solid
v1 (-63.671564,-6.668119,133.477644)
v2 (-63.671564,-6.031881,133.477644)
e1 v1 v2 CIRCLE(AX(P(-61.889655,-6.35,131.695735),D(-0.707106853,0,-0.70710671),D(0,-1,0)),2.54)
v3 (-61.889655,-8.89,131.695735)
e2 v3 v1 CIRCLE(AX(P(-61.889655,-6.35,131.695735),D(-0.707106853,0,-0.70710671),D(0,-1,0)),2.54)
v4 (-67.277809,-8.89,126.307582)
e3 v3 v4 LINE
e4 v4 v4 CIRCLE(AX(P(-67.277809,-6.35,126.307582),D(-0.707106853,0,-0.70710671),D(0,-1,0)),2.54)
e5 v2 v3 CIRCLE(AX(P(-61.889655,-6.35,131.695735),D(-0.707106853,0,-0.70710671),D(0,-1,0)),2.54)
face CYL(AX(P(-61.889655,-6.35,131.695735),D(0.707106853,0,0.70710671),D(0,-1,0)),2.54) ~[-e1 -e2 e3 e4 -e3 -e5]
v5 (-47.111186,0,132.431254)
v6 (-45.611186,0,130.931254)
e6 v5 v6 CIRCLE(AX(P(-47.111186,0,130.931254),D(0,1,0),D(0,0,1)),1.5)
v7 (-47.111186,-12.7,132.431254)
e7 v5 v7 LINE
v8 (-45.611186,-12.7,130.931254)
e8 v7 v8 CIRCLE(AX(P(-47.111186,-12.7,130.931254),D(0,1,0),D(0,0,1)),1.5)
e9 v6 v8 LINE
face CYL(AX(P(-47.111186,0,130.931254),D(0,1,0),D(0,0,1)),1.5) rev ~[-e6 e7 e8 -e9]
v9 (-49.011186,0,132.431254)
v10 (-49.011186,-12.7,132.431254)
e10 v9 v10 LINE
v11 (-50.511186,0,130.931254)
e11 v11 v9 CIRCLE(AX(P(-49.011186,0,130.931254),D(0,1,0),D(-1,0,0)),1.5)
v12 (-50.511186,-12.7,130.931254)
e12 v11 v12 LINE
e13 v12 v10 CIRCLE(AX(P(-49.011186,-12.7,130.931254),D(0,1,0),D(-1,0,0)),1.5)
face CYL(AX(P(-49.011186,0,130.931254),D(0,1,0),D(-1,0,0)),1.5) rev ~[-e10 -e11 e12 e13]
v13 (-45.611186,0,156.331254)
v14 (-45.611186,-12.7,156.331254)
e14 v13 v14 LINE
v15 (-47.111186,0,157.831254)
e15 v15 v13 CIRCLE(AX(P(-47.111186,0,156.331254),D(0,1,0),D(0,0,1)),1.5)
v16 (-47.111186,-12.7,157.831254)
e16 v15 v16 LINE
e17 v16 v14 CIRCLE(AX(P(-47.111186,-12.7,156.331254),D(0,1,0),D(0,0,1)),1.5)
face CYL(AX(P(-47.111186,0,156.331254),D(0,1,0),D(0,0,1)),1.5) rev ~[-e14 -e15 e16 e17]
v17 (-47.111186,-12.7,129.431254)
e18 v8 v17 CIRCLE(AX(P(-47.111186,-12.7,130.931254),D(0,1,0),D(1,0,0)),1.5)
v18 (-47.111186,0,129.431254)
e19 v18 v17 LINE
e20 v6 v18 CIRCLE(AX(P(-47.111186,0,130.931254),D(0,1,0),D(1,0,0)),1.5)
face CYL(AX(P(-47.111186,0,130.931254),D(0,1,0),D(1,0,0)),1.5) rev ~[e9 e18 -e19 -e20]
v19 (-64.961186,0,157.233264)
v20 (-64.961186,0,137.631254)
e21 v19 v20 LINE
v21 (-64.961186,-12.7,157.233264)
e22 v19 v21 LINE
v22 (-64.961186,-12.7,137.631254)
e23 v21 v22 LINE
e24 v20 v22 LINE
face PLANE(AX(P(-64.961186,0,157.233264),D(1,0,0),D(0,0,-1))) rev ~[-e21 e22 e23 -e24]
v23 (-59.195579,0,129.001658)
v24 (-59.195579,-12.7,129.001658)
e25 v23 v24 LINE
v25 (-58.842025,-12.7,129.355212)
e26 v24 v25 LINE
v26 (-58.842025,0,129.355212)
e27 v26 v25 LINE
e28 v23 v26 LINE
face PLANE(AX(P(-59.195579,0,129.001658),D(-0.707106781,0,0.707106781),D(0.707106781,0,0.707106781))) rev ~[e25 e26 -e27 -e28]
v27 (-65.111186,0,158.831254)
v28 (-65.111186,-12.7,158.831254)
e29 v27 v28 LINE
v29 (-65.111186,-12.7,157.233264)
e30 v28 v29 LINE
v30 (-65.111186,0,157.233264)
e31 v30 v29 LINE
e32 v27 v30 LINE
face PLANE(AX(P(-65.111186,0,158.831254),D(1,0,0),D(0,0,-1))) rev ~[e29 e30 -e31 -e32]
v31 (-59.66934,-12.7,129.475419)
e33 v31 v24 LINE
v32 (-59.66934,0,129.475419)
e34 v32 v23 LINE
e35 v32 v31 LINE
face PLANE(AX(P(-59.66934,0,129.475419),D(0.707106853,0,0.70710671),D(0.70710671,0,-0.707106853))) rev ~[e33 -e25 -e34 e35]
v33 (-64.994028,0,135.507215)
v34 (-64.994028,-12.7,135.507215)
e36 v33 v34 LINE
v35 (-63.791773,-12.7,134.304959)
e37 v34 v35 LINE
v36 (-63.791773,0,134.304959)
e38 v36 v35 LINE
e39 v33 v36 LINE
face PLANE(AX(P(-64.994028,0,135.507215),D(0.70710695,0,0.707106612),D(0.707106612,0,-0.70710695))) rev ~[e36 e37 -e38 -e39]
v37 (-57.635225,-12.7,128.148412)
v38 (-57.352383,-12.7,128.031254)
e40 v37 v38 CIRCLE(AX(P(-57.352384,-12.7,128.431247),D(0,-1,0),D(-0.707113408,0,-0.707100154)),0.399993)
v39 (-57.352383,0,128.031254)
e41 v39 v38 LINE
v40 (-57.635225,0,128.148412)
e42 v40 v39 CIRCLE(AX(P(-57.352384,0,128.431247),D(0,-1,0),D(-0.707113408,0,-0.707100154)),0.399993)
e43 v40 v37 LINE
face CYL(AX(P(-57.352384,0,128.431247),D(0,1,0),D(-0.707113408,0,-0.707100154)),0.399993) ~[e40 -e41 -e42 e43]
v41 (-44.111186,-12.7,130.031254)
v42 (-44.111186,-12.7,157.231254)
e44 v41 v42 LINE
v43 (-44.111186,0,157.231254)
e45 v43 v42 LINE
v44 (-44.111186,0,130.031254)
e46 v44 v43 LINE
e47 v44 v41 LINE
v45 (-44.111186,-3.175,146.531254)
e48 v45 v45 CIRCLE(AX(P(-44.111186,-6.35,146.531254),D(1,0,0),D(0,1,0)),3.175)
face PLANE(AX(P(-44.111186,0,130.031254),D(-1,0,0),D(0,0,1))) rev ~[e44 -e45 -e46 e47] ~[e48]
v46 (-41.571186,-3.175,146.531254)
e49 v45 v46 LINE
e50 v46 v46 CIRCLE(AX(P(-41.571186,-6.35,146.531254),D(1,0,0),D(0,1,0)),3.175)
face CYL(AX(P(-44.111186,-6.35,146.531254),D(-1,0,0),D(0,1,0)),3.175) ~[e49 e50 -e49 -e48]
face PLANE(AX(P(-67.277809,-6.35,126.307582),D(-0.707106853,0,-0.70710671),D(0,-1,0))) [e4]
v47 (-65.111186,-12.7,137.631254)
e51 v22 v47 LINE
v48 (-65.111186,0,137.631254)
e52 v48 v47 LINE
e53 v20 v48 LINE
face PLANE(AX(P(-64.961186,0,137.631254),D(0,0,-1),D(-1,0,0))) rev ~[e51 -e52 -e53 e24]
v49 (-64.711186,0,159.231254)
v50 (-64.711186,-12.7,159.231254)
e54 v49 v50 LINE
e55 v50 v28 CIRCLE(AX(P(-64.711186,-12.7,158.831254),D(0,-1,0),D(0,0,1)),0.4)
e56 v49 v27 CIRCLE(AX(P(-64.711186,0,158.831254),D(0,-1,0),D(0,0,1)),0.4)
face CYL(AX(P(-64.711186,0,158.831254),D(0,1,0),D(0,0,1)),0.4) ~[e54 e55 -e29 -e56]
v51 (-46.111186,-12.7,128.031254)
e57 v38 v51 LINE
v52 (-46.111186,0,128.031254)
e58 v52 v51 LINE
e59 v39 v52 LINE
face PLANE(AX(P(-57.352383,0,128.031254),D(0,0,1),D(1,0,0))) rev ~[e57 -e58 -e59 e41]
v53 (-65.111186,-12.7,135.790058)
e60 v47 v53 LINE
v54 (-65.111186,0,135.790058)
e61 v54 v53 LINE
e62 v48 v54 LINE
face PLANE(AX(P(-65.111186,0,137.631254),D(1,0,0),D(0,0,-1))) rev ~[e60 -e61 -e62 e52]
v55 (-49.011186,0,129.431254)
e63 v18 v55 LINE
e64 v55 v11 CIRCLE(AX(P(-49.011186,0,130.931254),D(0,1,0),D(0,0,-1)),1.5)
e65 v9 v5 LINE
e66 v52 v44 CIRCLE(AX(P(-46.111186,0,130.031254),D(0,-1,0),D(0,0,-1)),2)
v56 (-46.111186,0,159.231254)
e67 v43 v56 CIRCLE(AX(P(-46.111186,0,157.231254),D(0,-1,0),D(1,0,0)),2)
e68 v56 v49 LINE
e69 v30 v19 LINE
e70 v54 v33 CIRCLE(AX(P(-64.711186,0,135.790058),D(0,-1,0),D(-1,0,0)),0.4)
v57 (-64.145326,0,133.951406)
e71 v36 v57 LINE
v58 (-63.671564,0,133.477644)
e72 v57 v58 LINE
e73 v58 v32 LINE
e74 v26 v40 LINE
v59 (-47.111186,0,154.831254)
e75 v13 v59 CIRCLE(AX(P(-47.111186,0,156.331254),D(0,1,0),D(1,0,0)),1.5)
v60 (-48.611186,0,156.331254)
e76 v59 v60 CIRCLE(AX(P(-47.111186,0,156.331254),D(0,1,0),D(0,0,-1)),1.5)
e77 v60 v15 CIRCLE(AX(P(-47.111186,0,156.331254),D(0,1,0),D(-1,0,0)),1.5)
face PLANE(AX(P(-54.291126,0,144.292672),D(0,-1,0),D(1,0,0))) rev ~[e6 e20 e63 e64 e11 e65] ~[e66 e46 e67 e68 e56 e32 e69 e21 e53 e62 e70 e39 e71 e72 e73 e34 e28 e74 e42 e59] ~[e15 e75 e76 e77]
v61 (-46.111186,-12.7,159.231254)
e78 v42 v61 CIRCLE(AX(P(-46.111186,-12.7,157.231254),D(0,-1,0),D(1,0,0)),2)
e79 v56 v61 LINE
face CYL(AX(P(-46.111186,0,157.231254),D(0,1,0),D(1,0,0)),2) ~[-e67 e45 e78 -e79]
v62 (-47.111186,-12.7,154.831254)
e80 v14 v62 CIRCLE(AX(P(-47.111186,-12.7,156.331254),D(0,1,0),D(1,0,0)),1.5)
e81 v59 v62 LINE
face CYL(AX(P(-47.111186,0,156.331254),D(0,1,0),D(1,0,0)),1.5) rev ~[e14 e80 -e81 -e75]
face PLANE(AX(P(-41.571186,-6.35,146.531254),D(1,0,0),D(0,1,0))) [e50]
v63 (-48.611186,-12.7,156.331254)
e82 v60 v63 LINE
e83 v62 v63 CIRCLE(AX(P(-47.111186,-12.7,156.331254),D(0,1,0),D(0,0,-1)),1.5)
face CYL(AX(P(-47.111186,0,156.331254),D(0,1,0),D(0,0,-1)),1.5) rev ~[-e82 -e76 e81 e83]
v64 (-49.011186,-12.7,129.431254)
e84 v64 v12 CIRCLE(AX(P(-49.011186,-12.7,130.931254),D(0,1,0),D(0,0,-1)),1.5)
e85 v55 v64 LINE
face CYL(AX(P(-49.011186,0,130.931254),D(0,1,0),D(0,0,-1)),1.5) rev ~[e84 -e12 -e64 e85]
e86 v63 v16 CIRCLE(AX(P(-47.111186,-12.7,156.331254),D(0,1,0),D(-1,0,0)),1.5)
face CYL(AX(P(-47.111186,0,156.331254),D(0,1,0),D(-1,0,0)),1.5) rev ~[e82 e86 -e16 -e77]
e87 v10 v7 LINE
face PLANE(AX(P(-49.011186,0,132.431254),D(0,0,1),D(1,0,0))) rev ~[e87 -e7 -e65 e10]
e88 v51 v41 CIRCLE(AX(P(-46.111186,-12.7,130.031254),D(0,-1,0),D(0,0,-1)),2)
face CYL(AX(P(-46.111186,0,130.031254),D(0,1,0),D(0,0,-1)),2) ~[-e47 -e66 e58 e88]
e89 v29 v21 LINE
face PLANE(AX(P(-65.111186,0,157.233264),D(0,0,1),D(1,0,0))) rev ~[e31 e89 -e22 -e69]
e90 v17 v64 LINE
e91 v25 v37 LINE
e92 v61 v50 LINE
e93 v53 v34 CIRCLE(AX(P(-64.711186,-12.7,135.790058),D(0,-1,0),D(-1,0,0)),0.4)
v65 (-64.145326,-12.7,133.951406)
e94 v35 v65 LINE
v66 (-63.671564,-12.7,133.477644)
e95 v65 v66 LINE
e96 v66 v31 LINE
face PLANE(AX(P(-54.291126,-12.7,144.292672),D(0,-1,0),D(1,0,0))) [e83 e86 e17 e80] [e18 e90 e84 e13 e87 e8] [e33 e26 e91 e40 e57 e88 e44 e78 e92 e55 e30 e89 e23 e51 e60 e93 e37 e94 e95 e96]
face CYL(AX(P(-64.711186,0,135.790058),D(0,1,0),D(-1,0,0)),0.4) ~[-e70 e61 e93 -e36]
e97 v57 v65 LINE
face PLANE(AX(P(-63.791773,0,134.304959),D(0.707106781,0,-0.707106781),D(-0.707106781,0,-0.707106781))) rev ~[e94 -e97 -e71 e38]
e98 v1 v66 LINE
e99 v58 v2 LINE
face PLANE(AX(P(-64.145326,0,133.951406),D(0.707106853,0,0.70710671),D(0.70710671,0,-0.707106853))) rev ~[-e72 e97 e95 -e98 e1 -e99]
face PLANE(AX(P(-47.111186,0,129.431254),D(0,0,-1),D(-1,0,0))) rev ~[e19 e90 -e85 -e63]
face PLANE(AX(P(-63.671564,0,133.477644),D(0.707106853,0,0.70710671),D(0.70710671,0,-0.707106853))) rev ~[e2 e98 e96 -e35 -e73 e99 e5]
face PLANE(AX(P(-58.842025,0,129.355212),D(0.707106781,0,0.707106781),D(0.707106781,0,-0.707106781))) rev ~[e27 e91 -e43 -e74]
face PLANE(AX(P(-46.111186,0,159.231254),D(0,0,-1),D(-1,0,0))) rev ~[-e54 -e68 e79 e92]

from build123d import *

# Parameters (mm, degrees)
F1_DEPTH = 12.7
F2_R     = 2.54
F3_DEPTH = 7.62
F4_R     = 3.175
F5_DEPTH = 2.54


# Not quite as in the source:
# - ends of sketch curves that miss each other by under 0.0002 mm in the source are joined


with BuildPart() as f1:
    # F0 (on Front) → F1 (new body)
    with BuildSketch(Plane.XZ):
        with BuildLine():
            Line((-46.1111856, 159.2312536), (-64.7111856, 159.2312536))
            ThreePointArc((-64.7111856, 159.2312536), (-64.9940283125, 159.1140963125), (-65.1111856, 158.8312536))
            Line((-65.1111856, 158.8312536), (-65.1111856, 157.2332636))
            Line((-65.1111856, 157.2332636), (-64.9611856, 157.2332636))
            Line((-64.9611856, 157.2332636), (-64.9611856, 137.6312536))
            Line((-64.9611856, 137.6312536), (-65.1111856, 137.6312536))
            Line((-65.1111856, 137.6312536), (-65.1111856, 135.7900576))
            ThreePointArc((-65.1111856, 135.7900576), (-65.080737413, 135.6369842271), (-64.9940283125, 135.5072148875))
            Line((-64.9940283125, 135.5072148875), (-63.7917726, 134.3049586))
            Line((-63.7917726, 134.3049586), (-64.1453256, 133.9514056))
            Line((-64.1453256, 133.9514056), (-63.6715641479, 133.4776440521))
            Line((-63.6715641479, 133.4776440521), (-59.6693400521, 129.4754191479))
            Line((-59.6693400521, 129.4754191479), (-59.1955786, 129.0016576))
            Line((-59.1955786, 129.0016576), (-58.8420246, 129.3552116))
            Line((-58.8420246, 129.3552116), (-57.6352246, 128.1484116))
            ThreePointArc((-57.6352246, 128.1484116), (-57.5054559729, 128.061701787), (-57.3523826, 128.0312536))
            Line((-57.3523826, 128.0312536), (-46.1111856, 128.0312536))
            ThreePointArc((-46.1111856, 128.0312536), (-44.6969720376, 128.6170400376), (-44.1111856, 130.0312536))
            Line((-44.1111856, 130.0312536), (-44.1111856, 134.1120546))
            Line((-44.1111856, 134.1120546), (-44.1111856, 153.1264526))
            Line((-44.1111856, 153.1264526), (-44.1111856, 156.3312536))
            Line((-44.1111856, 156.3312536), (-44.1111856, 157.2312536))
            ThreePointArc((-44.1111856, 157.2312536), (-44.6969720376, 158.6454671624), (-46.1111856, 159.2312536))
        make_face()
        with BuildLine():
            Line((-49.0111856, 132.4312536), (-47.1111856, 132.4312536))
            ThreePointArc((-47.1111856, 132.4312536), (-46.0505254282, 131.9919137718), (-45.6111856, 130.9312536))
            ThreePointArc((-45.6111856, 130.9312536), (-46.0505254282, 129.8705934282), (-47.1111856, 129.4312536))
            Line((-47.1111856, 129.4312536), (-49.0111856, 129.4312536))
            ThreePointArc((-49.0111856, 129.4312536), (-50.0718457718, 129.8705934282), (-50.5111856, 130.9312536))
            ThreePointArc((-50.5111856, 130.9312536), (-50.0718457718, 131.9919137718), (-49.0111856, 132.4312536))
        make_face(mode=Mode.SUBTRACT)
        with BuildLine():
            ThreePointArc((-47.1111856, 157.8312536), (-46.0505254282, 157.3919137718), (-45.6111856, 156.3312536))
            ThreePointArc((-45.6111856, 156.3312536), (-46.0505254282, 155.2705934282), (-47.1111856, 154.8312536))
            ThreePointArc((-47.1111856, 154.8312536), (-48.1718457718, 155.2705934282), (-48.6111856, 156.3312536))
            ThreePointArc((-48.6111856, 156.3312536), (-48.1718457718, 157.3919137718), (-47.1111856, 157.8312536))
        make_face(mode=Mode.SUBTRACT)
    extrude(amount=F1_DEPTH)

    # F2 (on face) → F3 (join)
    with BuildSketch(Plane(origin=(34.9030335203, 0, 34.9030264689), x_dir=(0, -1, 0), z_dir=(-0.7071068526, 0, -0.7071067098))):
        with Locations((6.35, 136.8855469037)):
            Circle(F2_R)
    extrude(amount=F3_DEPTH)

    # F4 (on face) → F5 (join)
    with BuildSketch(Plane.YZ.offset(-44.1111856)):
        with Locations((-6.35, 146.5312536)):
            Circle(F4_R)
    extrude(amount=F5_DEPTH)


solid = f1.part
